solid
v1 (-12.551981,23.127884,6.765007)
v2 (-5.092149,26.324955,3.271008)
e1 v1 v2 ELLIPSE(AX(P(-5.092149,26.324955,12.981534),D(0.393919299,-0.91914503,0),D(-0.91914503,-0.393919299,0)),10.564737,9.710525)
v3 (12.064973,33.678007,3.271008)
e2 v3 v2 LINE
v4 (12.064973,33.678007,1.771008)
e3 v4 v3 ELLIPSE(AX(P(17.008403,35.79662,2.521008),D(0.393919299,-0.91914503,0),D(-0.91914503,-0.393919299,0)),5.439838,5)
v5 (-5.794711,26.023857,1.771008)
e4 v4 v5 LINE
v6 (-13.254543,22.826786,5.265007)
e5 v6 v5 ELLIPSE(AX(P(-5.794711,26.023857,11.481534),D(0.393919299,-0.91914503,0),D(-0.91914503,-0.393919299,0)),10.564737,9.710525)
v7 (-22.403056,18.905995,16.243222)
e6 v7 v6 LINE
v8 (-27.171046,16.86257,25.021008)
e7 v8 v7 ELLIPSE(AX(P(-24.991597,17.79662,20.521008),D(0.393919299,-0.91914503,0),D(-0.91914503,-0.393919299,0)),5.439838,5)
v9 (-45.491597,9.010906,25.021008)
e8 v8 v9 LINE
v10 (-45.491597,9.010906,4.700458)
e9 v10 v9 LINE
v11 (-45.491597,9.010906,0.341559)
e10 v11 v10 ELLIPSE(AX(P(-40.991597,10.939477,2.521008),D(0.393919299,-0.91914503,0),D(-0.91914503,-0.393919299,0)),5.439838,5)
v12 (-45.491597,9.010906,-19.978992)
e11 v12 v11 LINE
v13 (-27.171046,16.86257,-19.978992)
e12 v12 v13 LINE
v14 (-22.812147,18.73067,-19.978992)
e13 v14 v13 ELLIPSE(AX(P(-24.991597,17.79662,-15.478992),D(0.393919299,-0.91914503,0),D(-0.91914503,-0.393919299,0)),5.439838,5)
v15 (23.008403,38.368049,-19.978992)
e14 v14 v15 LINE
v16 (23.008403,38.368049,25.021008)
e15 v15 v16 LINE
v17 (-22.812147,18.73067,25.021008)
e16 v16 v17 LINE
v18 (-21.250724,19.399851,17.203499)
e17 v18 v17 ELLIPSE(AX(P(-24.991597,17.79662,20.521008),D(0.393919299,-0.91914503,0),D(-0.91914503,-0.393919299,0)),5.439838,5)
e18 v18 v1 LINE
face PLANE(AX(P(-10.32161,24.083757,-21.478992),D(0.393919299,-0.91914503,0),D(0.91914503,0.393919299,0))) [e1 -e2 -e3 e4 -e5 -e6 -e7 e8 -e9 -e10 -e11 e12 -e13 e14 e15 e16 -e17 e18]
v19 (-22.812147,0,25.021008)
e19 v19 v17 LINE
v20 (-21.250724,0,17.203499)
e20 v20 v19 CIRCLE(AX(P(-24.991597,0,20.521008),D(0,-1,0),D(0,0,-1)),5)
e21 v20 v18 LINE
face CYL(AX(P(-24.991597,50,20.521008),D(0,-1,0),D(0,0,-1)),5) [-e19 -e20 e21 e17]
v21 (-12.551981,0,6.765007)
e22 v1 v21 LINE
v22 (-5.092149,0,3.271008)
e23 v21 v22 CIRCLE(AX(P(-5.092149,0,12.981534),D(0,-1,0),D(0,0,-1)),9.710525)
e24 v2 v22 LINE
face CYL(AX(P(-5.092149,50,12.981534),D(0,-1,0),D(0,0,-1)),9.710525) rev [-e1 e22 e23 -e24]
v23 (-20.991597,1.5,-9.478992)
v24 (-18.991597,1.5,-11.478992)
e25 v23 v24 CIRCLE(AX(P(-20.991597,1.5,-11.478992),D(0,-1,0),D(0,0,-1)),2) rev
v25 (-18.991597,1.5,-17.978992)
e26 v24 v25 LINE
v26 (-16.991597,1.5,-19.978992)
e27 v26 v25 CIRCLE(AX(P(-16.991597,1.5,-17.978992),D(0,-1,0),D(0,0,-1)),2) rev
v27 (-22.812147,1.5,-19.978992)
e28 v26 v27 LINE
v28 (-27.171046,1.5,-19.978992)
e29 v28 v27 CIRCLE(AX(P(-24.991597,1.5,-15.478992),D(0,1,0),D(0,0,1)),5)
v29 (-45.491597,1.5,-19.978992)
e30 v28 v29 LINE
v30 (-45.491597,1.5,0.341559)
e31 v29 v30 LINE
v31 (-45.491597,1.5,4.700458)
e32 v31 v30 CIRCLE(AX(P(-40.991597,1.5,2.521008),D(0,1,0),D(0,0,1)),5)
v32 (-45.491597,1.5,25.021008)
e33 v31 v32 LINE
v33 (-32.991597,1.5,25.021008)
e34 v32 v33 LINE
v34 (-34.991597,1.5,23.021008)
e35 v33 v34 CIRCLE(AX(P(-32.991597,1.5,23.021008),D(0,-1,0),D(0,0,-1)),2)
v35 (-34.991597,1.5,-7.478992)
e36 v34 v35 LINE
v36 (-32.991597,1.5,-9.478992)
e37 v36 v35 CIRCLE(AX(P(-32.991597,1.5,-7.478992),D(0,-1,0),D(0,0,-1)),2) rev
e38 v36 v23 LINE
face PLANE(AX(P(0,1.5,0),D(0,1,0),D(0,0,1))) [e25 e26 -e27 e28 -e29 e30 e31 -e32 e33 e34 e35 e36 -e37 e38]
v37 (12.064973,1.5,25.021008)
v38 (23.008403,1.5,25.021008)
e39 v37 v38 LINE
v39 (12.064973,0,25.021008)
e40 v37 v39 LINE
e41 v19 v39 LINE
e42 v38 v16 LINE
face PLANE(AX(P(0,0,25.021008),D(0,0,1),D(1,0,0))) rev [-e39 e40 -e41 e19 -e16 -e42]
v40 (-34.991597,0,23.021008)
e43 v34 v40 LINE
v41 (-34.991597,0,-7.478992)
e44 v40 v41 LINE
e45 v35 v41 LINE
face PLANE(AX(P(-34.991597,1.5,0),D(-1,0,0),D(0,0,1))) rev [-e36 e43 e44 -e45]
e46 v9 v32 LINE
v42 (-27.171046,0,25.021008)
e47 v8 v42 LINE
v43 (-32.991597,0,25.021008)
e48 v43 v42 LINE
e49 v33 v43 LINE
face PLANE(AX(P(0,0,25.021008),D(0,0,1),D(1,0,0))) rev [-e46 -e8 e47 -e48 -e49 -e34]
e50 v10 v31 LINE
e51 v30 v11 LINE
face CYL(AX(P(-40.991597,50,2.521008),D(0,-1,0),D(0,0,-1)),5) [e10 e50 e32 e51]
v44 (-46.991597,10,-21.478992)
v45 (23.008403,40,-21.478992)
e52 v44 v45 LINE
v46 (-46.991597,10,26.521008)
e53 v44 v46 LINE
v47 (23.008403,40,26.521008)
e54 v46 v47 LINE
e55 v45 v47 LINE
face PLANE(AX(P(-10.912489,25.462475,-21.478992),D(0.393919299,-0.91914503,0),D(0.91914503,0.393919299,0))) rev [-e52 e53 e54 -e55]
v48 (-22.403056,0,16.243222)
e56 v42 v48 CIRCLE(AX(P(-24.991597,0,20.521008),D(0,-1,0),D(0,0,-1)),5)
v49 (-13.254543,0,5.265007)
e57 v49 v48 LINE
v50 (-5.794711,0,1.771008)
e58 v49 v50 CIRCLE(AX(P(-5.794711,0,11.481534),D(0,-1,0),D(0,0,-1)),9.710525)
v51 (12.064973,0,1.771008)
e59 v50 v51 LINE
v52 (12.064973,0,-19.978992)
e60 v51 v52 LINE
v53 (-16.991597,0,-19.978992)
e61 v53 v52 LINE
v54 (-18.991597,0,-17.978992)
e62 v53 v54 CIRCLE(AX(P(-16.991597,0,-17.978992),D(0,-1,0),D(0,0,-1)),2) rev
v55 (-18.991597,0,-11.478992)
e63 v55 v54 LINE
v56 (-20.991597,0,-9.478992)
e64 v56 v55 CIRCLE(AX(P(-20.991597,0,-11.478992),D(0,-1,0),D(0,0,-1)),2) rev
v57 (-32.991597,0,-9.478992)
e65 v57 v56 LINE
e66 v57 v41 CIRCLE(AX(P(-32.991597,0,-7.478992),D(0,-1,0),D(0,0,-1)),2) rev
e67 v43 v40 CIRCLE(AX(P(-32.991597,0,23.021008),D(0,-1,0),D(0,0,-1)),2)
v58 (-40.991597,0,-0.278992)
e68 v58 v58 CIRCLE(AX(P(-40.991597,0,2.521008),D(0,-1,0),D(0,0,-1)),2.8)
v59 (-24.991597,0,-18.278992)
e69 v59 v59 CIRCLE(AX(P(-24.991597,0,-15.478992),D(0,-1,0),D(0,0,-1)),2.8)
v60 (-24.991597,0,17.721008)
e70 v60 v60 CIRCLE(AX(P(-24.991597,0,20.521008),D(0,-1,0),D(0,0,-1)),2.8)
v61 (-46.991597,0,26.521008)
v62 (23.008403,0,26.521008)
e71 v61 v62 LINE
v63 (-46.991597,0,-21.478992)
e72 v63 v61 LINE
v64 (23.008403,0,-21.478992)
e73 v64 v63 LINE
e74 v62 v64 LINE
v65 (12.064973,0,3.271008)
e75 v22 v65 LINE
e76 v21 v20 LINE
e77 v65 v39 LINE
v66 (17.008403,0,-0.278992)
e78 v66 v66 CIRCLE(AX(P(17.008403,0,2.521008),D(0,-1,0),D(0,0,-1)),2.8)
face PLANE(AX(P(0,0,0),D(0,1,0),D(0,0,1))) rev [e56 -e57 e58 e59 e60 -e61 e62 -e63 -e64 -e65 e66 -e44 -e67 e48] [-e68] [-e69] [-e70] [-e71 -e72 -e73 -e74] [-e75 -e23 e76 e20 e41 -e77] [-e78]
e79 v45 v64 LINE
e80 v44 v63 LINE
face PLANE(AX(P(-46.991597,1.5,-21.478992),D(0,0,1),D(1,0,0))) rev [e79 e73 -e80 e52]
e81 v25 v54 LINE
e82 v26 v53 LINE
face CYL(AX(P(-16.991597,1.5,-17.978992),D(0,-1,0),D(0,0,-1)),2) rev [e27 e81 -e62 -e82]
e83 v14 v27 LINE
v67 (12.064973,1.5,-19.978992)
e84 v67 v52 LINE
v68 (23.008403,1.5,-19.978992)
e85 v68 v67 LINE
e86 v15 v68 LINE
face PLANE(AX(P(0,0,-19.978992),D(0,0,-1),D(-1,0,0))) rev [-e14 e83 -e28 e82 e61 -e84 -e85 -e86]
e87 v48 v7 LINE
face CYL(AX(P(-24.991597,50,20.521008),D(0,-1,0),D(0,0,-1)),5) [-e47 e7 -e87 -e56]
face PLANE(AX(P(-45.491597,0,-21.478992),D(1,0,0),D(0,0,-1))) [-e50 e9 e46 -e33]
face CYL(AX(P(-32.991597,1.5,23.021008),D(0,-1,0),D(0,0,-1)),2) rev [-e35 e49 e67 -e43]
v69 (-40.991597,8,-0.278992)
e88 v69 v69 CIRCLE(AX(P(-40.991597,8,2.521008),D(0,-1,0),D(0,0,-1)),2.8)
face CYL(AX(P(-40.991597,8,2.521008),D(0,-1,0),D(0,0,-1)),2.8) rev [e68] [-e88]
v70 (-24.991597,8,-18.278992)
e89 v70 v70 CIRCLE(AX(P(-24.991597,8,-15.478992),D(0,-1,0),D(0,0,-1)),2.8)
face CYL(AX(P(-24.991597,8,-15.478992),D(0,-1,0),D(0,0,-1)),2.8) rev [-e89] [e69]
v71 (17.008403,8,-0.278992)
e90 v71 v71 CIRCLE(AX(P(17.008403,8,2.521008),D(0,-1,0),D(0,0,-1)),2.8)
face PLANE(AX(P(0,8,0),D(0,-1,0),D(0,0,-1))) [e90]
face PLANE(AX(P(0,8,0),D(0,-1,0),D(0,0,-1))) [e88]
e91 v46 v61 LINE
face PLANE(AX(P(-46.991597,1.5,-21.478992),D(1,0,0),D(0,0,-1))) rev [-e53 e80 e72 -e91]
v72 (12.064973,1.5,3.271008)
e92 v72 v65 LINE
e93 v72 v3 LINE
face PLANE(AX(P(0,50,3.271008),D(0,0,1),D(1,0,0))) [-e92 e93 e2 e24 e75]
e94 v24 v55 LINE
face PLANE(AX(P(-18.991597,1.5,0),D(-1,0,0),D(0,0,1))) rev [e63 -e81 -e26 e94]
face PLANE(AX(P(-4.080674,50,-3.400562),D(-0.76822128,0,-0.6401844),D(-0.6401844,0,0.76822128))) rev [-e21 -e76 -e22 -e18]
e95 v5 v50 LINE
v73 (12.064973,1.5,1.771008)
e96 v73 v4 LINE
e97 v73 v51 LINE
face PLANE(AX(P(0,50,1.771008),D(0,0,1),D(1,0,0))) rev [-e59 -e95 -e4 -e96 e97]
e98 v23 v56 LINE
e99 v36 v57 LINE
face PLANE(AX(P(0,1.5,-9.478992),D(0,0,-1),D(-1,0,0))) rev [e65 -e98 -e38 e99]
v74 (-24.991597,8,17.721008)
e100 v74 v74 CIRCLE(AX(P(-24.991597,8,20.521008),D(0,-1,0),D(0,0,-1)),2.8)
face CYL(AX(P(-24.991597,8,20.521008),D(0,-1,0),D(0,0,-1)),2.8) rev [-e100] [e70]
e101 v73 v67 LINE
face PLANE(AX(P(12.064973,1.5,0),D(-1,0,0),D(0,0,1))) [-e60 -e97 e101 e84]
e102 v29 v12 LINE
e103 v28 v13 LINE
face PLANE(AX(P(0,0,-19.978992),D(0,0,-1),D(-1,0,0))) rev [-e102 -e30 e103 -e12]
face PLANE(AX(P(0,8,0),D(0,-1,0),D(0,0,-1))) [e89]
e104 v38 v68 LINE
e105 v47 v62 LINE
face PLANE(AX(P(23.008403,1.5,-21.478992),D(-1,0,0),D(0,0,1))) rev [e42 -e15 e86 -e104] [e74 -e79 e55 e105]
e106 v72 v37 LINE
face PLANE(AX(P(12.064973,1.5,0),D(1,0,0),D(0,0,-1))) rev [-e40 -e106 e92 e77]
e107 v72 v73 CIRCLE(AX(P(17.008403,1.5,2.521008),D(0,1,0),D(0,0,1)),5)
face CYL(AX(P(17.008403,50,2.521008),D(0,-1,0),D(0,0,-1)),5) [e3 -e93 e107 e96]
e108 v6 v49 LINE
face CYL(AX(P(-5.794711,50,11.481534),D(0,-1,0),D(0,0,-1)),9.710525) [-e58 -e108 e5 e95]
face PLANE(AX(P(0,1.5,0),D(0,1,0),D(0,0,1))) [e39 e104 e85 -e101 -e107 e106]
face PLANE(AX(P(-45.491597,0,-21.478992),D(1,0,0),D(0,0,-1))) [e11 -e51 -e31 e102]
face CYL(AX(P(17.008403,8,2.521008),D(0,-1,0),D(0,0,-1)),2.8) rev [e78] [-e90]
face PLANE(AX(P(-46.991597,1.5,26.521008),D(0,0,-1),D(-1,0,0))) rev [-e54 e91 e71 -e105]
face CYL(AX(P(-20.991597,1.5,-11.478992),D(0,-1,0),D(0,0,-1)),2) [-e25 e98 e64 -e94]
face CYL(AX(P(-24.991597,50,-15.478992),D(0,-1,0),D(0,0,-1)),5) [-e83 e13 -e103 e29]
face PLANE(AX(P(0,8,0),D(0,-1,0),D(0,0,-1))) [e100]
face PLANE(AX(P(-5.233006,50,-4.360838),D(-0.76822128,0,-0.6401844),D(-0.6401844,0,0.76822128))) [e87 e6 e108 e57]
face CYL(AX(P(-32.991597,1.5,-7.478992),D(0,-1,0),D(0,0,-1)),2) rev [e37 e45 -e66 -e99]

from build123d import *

# Parameters (mm, degrees)
SKETCH1_W           = 70
SKETCH1_H           = 48
BOSS_EXTRUDE1_DEPTH = 1.5
BOSS_EXTRUDE2_DEPTH = 48
BOSS_EXTRUDE3_DEPTH = 1.5
BOSS_EXTRUDE4_DEPTH = 1.5
SKETCH9_R           = 5
BOSS_EXTRUDE5_DEPTH = 50
SKETCH10_R          = 2.8
CUT_EXTRUDE1_DEPTH  = 8
BOSS_EXTRUDE7_START = -50
BOSS_EXTRUDE7_DEPTH = 48.5
CUT_EXTRUDE4_DEPTH  = 52.511197813
CUT_EXTRUDE6_DEPTH  = 1.5


# Read off the part's stored shape, not the designer's step: Boss-Extrude7
with BuildPart() as part:
    # Sketch1 → Boss-Extrude1 (new body)
    with BuildSketch(Plane(origin=(0, 0, 0), x_dir=(1, 0, 0), z_dir=(0, 1, 0))):
        with Locations((-11.991596639, -2.521008403)):
            Rectangle(SKETCH1_W, SKETCH1_H)
    extrude(amount=BOSS_EXTRUDE1_DEPTH)

    # Sketch13 → Boss-Extrude2 (add)
    with BuildSketch(Plane.XY.offset(26.521008403)):
        Polygon((-46.991596639, 10), (-46.991596639, 1.5), (-45.491596639, 1.5), (-45.491596639, 9.010905763), (23.008403361, 38.36804862), (23.008403361, 40), align=None)
    extrude(amount=-BOSS_EXTRUDE2_DEPTH)

    # Sketch14 → Boss-Extrude3 (add)
    with BuildSketch(Plane.XY.offset(26.521008403)):
        Polygon((-46.991596639, 0), (23.008403361, 0), (23.008403361, 40), (-46.991596639, 10), align=None)
    extrude(amount=-BOSS_EXTRUDE3_DEPTH)

    # Sketch15 → Boss-Extrude4 (add)
    with BuildSketch(Plane(origin=(0, 0, -21.478991597), x_dir=(-1, 0, 0), z_dir=(0, 0, -1))):
        Polygon((-23.008403361, 0), (46.991596639, 0), (46.991596639, 10), (-23.008403361, 40), align=None)
    extrude(amount=-BOSS_EXTRUDE4_DEPTH)

    # Sketch9 → Boss-Extrude5 (add)
    with BuildSketch(Plane.XZ):
        with Locations(Location((-40.991596639, 2.521008403, 0), (0, 0, 270))):
            Circle(SKETCH9_R)
        with Locations(Location((-24.991596639, 20.521008403, 0), (0, 0, 270))):
            Circle(SKETCH9_R)
        with Locations(Location((17.008403361, 2.521008403, 0), (0, 0, 270))):
            Circle(SKETCH9_R)
        with Locations(Location((-24.991596639, -15.478991597, 0), (0, 0, 270))):
            Circle(SKETCH9_R)
    extrude(amount=-BOSS_EXTRUDE5_DEPTH)

    # Sketch10 → Cut-Extrude1 (cut)
    with BuildSketch(Plane.XZ):
        with Locations(Location((-40.991596639, 2.521008403, 0), (0, 0, 270))):
            Circle(SKETCH10_R)
        with Locations(Location((-24.991596639, 20.521008403, 0), (0, 0, 270))):
            Circle(SKETCH10_R)
        with Locations(Location((-24.991596639, -15.478991597, 0), (0, 0, 270))):
            Circle(SKETCH10_R)
        with Locations(Location((17.008403361, 2.521008403, 0), (0, 0, 270))):
            Circle(SKETCH10_R)
    extrude(amount=-CUT_EXTRUDE1_DEPTH, mode=Mode.SUBTRACT)

    # Boss-Extrude7 outline → Boss-Extrude7 (add)
    with BuildSketch(Plane.XZ.offset(BOSS_EXTRUDE7_START)):
        with BuildLine():
            ThreePointArc((-21.250723923, 17.203498596), (-21.79067464, 16.679902005), (-22.403055842, 16.243221996))
            Line((-22.403055842, 16.243221996), (-13.254543259, 5.265006896))
            ThreePointArc((-13.254543259, 5.265006896), (-9.913482791, 2.687784718), (-5.794711082, 1.771008403))
            Line((-5.794711082, 1.771008403), (12.064973378, 1.771008403))
            ThreePointArc((12.064973378, 1.771008403), (12.008403361, 2.521008403), (12.064973378, 3.271008403))
            Line((12.064973378, 3.271008403), (-5.092148663, 3.271008403))
            ThreePointArc((-5.092148663, 3.271008403), (-9.210920372, 4.187784718), (-12.55198084, 6.765006896))
            Line((-12.55198084, 6.765006896), (-21.250723923, 17.203498596))
        make_face()
    extrude(amount=BOSS_EXTRUDE7_DEPTH)

    # Sketch20 → Cut-Extrude4 (cut, through all)
    with BuildSketch(Plane(origin=(-10.912489134, 25.462474645, 0), x_dir=(0.9191450300180579, 0.3939192985791677, 0), z_dir=(-0.3939192985791677, 0.9191450300180579, 0))):
        with BuildLine():
            add(Edge.make_bspline(
                [(-15.317612613, 20.478991597), (-24.739688298, 20.478991597), (-20.028650455, 12.978991597), (-15.317612613, 5.478991597), (-10.606574771, 12.978991597), (-5.895536929, 20.478991597), (-15.317612613, 20.478991597)],
                knots=[4.71238898, 4.71238898, 4.71238898, 6.806784083, 6.806784083, 8.901179185, 8.901179185, 10.995574288, 10.995574288, 10.995574288], degree=2, weights=[1, 0.5, 1, 0.5, 1, 0.5, 1]))
        make_face()
        with BuildLine():
            add(Edge.make_bspline(
                [(24.998734434, -3.271008403), (26.776327601, -14.040210809), (34.50198737, -5.780609606), (42.227647139, 2.478991597), (30.377026022, 2.478991597)],
                knots=[0.150568273, 0.150568273, 0.150568273, 2.431478627, 2.431478627, 4.71238898, 4.71238898, 4.71238898], degree=2, weights=[1, 0.417180872, 1, 0.417180872, 1]))
            add(Edge.make_bspline(
                [(30.377026022, 2.478991597), (25.700250728, 2.478991597), (24.998734434, -1.771008403)],
                knots=[4.71238898, 4.71238898, 4.71238898, 6.132617034, 6.132617034, 6.132617034], degree=2, weights=[1, 0.758287544, 1]))
            Line((24.998734434, -1.771008403), (5.567976635, -1.771008403))
            add(Edge.make_bspline(
                [(5.567976635, -1.771008403), (0.619718616, -1.771008404), (-2.548078974, -5.265006896)],
                knots=[1.570796327, 1.570796327, 1.570796327, 2.446854377, 2.446854377, 2.446854377], degree=2, weights=[1, 0.905589421, 1]))
            Line((-2.548078974, -5.265006896), (-12.50136413, -16.243221996))
            add(Edge.make_bspline(
                [(-12.50136413, -16.243221996), (-13.799875321, -15.521008403), (-15.317612613, -15.521008403)],
                knots=[4.168218977, 4.168218977, 4.168218977, 4.71238898, 4.71238898, 4.71238898], degree=2, weights=[1, 0.963212666, 1]))
            add(Edge.make_bspline(
                [(-15.317612613, -15.521008403), (-22.262261076, -15.521008403), (-20.599158718, -21.718406923), (-18.936056359, -27.915805443), (-12.787966418, -24.947503117), (-6.639876476, -21.979200791), (-11.247664353, -17.203498596)],
                knots=[4.71238898, 4.71238898, 4.71238898, 6.525015233, 6.525015233, 8.337641486, 8.337641486, 10.150267739, 10.150267739, 10.150267739], degree=2, weights=[1, 0.616652372, 1, 0.616652372, 1, 0.616652372, 1]))
            Line((-11.247664353, -17.203498596), (-1.783713835, -6.765006896))
            add(Edge.make_bspline(
                [(6.332341775, -3.271008403), (1.384083756, -3.271008404), (-1.783713835, -6.765006896)],
                knots=[1.570796327, 1.570796327, 1.570796327, 2.446854377, 2.446854377, 2.446854377], degree=2, weights=[1, 0.905589421, 1]))
            Line((6.332341775, -3.271008403), (24.998734434, -3.271008403))
        make_face()
        with BuildLine():
            add(Edge.make_bspline(
                [(-32.725093998, 2.478991597), (-42.147169682, 2.478991597), (-37.43613184, -5.021008403), (-32.725093998, -12.521008403), (-28.014056156, -5.021008403), (-23.303018313, 2.478991597), (-32.725093998, 2.478991597)],
                knots=[4.71238898, 4.71238898, 4.71238898, 6.806784083, 6.806784083, 8.901179185, 8.901179185, 10.995574288, 10.995574288, 10.995574288], degree=2, weights=[1, 0.5, 1, 0.5, 1, 0.5, 1]))
        make_face()
    extrude(amount=CUT_EXTRUDE4_DEPTH, mode=Mode.SUBTRACT)


with BuildPart() as cut_extrude4_kept_piece:
    # of the separate pieces the step leaves, the one the design keeps (cut_extrude4_pieces_kept)
    add(part.part.solids().sort_by_distance((-46.991596639, 0, -21.478991597))[0])

    # Sketch22 → Cut-Extrude6 (cut)
    with BuildSketch(Plane.XZ):
        with BuildLine():
            Line((12.064973378, 3.271008403), (12.064973378, 25.021008403))
            Line((12.064973378, 25.021008403), (-22.812147167, 25.021008403))
            ThreePointArc((-22.812147167, 25.021008403), (-20.088442695, 21.500335417), (-21.250723923, 17.203498596))
            Line((-21.250723923, 17.203498596), (-12.55198084, 6.765006896))
            ThreePointArc((-12.55198084, 6.765006896), (-9.210920372, 4.187784718), (-5.092148663, 3.271008403))
            Line((-5.092148663, 3.271008403), (12.064973378, 3.271008403))
        make_face()
        with BuildLine():
            Line((-16.991596639, -19.978991597), (12.064973378, -19.978991597))
            Line((12.064973378, -19.978991597), (12.064973378, 1.771008403))
            Line((12.064973378, 1.771008403), (-5.794711082, 1.771008403))
            ThreePointArc((-5.794711082, 1.771008403), (-9.913482791, 2.687784718), (-13.254543259, 5.265006896))
            Line((-13.254543259, 5.265006896), (-22.403055842, 16.243221996))
            ThreePointArc((-22.403055842, 16.243221996), (-29.385253712, 18.134425591), (-27.17104611, 25.021008403))
            Line((-27.17104611, 25.021008403), (-32.991596639, 25.021008403))
            ThreePointArc((-32.991596639, 25.021008403), (-34.405810201, 24.435221966), (-34.991596639, 23.021008403))
            Line((-34.991596639, 23.021008403), (-34.991596639, -7.478991597))
            ThreePointArc((-34.991596639, -7.478991597), (-34.405810201, -8.893205159), (-32.991596639, -9.478991597))
            Line((-32.991596639, -9.478991597), (-20.991596639, -9.478991597))
            ThreePointArc((-20.991596639, -9.478991597), (-19.577383076, -10.064778034), (-18.991596639, -11.478991597))
            Line((-18.991596639, -11.478991597), (-18.991596639, -17.978991597))
            ThreePointArc((-18.991596639, -17.978991597), (-18.405810201, -19.393205159), (-16.991596639, -19.978991597))
        make_face()
    extrude(amount=-CUT_EXTRUDE6_DEPTH, mode=Mode.SUBTRACT)


solid = cut_extrude4_kept_piece.part
